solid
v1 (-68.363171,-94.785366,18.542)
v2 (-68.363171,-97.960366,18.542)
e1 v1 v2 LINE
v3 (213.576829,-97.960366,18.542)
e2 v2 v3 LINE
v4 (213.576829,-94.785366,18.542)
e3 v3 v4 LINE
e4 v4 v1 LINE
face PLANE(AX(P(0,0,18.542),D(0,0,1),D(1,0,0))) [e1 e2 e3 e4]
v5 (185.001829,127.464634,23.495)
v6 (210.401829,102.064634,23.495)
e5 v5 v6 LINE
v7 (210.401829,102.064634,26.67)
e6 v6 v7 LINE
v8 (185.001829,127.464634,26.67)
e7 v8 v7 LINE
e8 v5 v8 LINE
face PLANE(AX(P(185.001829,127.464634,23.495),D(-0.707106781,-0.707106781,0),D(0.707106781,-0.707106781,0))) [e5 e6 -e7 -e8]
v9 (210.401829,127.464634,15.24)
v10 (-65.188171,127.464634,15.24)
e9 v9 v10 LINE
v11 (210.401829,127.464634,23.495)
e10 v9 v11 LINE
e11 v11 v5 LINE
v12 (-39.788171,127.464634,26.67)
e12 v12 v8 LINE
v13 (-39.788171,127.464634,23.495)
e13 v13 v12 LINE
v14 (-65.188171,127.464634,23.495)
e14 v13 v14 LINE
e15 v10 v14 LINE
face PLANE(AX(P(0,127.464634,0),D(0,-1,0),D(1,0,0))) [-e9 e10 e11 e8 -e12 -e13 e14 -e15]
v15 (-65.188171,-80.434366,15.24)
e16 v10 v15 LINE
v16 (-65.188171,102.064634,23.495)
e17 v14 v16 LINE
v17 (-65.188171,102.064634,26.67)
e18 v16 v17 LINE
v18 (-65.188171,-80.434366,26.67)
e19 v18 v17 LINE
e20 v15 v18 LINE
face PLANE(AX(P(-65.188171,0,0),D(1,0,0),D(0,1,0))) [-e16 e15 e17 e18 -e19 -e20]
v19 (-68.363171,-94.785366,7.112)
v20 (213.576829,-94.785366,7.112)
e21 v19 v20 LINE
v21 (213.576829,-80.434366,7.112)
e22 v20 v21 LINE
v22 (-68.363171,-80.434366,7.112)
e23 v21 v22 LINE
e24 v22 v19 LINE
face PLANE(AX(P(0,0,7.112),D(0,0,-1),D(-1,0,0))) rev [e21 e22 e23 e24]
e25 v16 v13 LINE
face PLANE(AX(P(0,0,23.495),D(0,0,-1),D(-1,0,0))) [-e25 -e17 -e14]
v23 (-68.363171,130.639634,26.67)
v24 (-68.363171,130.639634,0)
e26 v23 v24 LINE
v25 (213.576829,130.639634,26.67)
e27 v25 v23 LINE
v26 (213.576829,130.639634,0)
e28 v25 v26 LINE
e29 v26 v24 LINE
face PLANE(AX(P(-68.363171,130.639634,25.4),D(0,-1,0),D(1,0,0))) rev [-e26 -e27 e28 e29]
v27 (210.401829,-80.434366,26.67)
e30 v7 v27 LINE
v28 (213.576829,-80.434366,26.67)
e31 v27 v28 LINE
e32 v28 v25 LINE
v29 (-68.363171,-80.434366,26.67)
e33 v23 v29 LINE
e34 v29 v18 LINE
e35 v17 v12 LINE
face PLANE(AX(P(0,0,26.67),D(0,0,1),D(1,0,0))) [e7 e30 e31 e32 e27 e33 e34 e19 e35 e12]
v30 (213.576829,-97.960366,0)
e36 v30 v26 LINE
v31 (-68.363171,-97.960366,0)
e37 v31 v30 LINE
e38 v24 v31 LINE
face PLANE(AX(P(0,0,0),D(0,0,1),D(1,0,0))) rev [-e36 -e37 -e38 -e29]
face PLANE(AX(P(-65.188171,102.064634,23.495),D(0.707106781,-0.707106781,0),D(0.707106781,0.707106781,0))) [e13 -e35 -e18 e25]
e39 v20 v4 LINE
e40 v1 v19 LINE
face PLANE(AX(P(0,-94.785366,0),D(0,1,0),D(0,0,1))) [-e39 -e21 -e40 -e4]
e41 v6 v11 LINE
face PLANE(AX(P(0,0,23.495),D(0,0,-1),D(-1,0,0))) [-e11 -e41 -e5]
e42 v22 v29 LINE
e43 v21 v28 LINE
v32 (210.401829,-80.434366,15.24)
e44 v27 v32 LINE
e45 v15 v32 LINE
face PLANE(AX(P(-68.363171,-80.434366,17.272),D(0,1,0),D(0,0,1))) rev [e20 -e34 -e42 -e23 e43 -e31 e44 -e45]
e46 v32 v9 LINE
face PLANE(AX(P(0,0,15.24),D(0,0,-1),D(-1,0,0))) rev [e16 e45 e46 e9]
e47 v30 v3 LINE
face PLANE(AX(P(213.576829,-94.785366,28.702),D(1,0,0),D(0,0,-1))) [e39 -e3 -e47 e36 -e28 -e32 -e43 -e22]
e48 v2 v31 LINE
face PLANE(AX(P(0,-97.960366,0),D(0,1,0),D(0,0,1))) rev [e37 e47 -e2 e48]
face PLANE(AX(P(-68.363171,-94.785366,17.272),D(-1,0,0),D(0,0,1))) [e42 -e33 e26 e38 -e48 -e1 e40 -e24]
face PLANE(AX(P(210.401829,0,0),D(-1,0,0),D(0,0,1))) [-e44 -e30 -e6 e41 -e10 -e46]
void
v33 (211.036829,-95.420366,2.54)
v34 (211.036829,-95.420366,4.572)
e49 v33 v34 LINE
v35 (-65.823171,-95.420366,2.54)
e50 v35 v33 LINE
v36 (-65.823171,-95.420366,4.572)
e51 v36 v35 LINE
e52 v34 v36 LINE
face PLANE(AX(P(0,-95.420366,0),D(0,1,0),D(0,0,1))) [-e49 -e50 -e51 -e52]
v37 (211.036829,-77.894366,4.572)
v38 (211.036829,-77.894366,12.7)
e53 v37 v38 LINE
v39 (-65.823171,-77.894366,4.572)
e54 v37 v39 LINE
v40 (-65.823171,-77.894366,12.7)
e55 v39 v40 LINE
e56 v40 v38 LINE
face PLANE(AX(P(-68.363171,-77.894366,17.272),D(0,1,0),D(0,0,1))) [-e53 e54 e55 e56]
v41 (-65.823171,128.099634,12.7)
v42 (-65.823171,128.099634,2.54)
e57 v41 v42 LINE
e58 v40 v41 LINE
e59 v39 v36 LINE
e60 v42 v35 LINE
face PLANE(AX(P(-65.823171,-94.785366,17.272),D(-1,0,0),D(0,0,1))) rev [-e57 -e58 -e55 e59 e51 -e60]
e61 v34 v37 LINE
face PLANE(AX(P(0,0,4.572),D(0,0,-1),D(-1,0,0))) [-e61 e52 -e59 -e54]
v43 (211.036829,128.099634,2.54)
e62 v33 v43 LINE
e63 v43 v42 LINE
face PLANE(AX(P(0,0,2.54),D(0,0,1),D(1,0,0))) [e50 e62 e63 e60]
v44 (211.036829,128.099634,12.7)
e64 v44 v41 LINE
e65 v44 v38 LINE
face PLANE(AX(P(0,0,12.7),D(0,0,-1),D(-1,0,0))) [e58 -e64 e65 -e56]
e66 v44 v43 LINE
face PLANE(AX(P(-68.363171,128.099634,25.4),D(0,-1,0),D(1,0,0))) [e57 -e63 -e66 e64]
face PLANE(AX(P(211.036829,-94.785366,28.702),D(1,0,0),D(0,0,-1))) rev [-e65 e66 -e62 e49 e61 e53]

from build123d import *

# Parameters (mm, degrees)
SKETCH1_W            = 281.94
SKETCH1_H            = 228.6
BOSS_EXTRUDE2_DEPTH  = 25.4
SKETCH3_W            = 281.94
SKETCH3_H            = 17.526
CUT_EXTRUDE1_DEPTH   = 8.128
SKETCH4_W            = 11.43
SKETCH4_H            = 211.074
BOSS_EXTRUDE4_DEPTH  = 3.175
SKETCH5_W            = 278.765
SKETCH5_H            = 11.43
BOSS_EXTRUDE9_DEPTH  = 3.175
SKETCH9_W            = 11.43
SKETCH9_H            = 207.899
BOSS_EXTRUDE10_DEPTH = 3.175
SKETCH8_W            = 281.94
SKETCH8_H            = 11.43
BOSS_EXTRUDE11_DEPTH = 3.175
SKETCH10_W           = 281.94
SKETCH10_H           = 14.351
CUT_EXTRUDE2_DEPTH   = 10.16
SKETCH11_W           = 275.59
SKETCH11_H           = 207.899
CUT_EXTRUDE3_DEPTH   = 10.16
CUT_EXTRUDE4_DEPTH   = 10.16
SKETCH13_W           = 281.94
SKETCH13_H           = 3.175
CUT_EXTRUDE5_DEPTH   = 10.16
SHELL4_START         = -65.823170732
SHELL4_DEPTH         = 276.86
BOSS_EXTRUDE12_DEPTH = 3.175


# Read off the part's stored shape, not the designer's step: Shell4
with BuildPart() as part:
    # Sketch1 → Boss-Extrude2 (new body)
    with BuildSketch(Plane.XY):
        with Locations((72.606829268, 16.339634146)):
            Rectangle(SKETCH1_W, SKETCH1_H)
    extrude(amount=BOSS_EXTRUDE2_DEPTH)

    # Sketch3 → Cut-Extrude1 (cut)
    with BuildSketch(Plane.XY.offset(25.4)):
        with Locations((72.606829268, -89.197365854)):
            Rectangle(SKETCH3_W, SKETCH3_H)
    extrude(amount=-CUT_EXTRUDE1_DEPTH, mode=Mode.SUBTRACT)



with BuildPart() as body_2:
    # Sketch4 → Boss-Extrude4 (new body)
    with BuildSketch(Plane.ZY.offset(68.363170732)):
        with Locations((31.115, 25.102634146)):
            Rectangle(SKETCH4_W, SKETCH4_H)
    extrude(amount=-BOSS_EXTRUDE4_DEPTH)


with BuildPart() as part_1:
    add(part.part)

    add(body_2.part)  # Boss-Extrude9 merges body 2
    # Sketch5 → Boss-Extrude9 (add)
    with BuildSketch(Plane(origin=(0, 130.639634146, 0), x_dir=(1, 0, 0), z_dir=(0, 1, 0))):
        with Locations((74.194329268, -31.115)):
            Rectangle(SKETCH5_W, SKETCH5_H)
    extrude(amount=-BOSS_EXTRUDE9_DEPTH)

    # Sketch9 → Boss-Extrude10 (add)
    with BuildSketch(Plane(origin=(213.576829268, 0, 0), x_dir=(0, 0, -1), z_dir=(1, 0, 0))):
        with Locations((-31.115, 23.515134146)):
            Rectangle(SKETCH9_W, SKETCH9_H)
    extrude(amount=-BOSS_EXTRUDE10_DEPTH)


with BuildPart() as body_2_2:
    # Sketch8 → Boss-Extrude11 (new body)
    with BuildSketch(Plane.XZ.offset(97.960365854)):
        with Locations((72.606829268, 22.987)):
            Rectangle(SKETCH8_W, SKETCH8_H)
    extrude(amount=-BOSS_EXTRUDE11_DEPTH)

    # Combine1: union part
    add(part_1.part)

    # Sketch10 → Cut-Extrude2 (cut)
    with BuildSketch(Plane.XY.offset(17.272)):
        with Locations((72.606829268, -87.609865854)):
            Rectangle(SKETCH10_W, SKETCH10_H)
    extrude(amount=-CUT_EXTRUDE2_DEPTH, mode=Mode.SUBTRACT)

    # Sketch11 → Cut-Extrude3 (cut)
    with BuildSketch(Plane.XY.offset(25.4)):
        with Locations((72.606829268, 23.515134146)):
            Rectangle(SKETCH11_W, SKETCH11_H)
    extrude(amount=-CUT_EXTRUDE3_DEPTH, mode=Mode.SUBTRACT)

    # Sketch12 → Cut-Extrude4 (cut)
    with BuildSketch(Plane.XY.offset(36.83)):
        Polygon((-68.363170732, -80.434365854), (-65.188170732, -80.434365854), (-65.188170732, 127.464634146), (210.401829268, 127.464634146), (210.401829268, -80.434365854), (213.576829268, -80.434365854), (213.576829268, 130.639634146), (-68.363170732, 130.639634146), align=None)
    extrude(amount=-CUT_EXTRUDE4_DEPTH, mode=Mode.SUBTRACT)

    # Sketch13 → Cut-Extrude5 (cut)
    with BuildSketch(Plane.XY.offset(28.702)):
        with Locations((72.606829268, -96.372865854)):
            Rectangle(SKETCH13_W, SKETCH13_H)
    extrude(amount=-CUT_EXTRUDE5_DEPTH, mode=Mode.SUBTRACT)

    # Shell4 outline → Shell4 (cut)
    with BuildSketch(Plane.YZ.offset(SHELL4_START)):
        Polygon((-95.420365854, 4.572), (-95.420365854, 2.54), (128.099634146, 2.54), (128.099634146, 12.7), (-77.894365854, 12.7), (-77.894365854, 4.572), align=None)
    extrude(amount=SHELL4_DEPTH, mode=Mode.SUBTRACT)

    # Sketch14 → Boss-Extrude12 (add)
    with BuildSketch(Plane.XY.offset(26.67)):
        Polygon((-65.188170732, 102.064634146), (-39.788170732, 127.464634146), (-65.188170732, 127.464634146), align=None)
        Polygon((185.001829268, 127.464634146), (210.401829268, 102.064634146), (210.401829268, 127.464634146), align=None)
    extrude(amount=-BOSS_EXTRUDE12_DEPTH)


solid = body_2_2.part
